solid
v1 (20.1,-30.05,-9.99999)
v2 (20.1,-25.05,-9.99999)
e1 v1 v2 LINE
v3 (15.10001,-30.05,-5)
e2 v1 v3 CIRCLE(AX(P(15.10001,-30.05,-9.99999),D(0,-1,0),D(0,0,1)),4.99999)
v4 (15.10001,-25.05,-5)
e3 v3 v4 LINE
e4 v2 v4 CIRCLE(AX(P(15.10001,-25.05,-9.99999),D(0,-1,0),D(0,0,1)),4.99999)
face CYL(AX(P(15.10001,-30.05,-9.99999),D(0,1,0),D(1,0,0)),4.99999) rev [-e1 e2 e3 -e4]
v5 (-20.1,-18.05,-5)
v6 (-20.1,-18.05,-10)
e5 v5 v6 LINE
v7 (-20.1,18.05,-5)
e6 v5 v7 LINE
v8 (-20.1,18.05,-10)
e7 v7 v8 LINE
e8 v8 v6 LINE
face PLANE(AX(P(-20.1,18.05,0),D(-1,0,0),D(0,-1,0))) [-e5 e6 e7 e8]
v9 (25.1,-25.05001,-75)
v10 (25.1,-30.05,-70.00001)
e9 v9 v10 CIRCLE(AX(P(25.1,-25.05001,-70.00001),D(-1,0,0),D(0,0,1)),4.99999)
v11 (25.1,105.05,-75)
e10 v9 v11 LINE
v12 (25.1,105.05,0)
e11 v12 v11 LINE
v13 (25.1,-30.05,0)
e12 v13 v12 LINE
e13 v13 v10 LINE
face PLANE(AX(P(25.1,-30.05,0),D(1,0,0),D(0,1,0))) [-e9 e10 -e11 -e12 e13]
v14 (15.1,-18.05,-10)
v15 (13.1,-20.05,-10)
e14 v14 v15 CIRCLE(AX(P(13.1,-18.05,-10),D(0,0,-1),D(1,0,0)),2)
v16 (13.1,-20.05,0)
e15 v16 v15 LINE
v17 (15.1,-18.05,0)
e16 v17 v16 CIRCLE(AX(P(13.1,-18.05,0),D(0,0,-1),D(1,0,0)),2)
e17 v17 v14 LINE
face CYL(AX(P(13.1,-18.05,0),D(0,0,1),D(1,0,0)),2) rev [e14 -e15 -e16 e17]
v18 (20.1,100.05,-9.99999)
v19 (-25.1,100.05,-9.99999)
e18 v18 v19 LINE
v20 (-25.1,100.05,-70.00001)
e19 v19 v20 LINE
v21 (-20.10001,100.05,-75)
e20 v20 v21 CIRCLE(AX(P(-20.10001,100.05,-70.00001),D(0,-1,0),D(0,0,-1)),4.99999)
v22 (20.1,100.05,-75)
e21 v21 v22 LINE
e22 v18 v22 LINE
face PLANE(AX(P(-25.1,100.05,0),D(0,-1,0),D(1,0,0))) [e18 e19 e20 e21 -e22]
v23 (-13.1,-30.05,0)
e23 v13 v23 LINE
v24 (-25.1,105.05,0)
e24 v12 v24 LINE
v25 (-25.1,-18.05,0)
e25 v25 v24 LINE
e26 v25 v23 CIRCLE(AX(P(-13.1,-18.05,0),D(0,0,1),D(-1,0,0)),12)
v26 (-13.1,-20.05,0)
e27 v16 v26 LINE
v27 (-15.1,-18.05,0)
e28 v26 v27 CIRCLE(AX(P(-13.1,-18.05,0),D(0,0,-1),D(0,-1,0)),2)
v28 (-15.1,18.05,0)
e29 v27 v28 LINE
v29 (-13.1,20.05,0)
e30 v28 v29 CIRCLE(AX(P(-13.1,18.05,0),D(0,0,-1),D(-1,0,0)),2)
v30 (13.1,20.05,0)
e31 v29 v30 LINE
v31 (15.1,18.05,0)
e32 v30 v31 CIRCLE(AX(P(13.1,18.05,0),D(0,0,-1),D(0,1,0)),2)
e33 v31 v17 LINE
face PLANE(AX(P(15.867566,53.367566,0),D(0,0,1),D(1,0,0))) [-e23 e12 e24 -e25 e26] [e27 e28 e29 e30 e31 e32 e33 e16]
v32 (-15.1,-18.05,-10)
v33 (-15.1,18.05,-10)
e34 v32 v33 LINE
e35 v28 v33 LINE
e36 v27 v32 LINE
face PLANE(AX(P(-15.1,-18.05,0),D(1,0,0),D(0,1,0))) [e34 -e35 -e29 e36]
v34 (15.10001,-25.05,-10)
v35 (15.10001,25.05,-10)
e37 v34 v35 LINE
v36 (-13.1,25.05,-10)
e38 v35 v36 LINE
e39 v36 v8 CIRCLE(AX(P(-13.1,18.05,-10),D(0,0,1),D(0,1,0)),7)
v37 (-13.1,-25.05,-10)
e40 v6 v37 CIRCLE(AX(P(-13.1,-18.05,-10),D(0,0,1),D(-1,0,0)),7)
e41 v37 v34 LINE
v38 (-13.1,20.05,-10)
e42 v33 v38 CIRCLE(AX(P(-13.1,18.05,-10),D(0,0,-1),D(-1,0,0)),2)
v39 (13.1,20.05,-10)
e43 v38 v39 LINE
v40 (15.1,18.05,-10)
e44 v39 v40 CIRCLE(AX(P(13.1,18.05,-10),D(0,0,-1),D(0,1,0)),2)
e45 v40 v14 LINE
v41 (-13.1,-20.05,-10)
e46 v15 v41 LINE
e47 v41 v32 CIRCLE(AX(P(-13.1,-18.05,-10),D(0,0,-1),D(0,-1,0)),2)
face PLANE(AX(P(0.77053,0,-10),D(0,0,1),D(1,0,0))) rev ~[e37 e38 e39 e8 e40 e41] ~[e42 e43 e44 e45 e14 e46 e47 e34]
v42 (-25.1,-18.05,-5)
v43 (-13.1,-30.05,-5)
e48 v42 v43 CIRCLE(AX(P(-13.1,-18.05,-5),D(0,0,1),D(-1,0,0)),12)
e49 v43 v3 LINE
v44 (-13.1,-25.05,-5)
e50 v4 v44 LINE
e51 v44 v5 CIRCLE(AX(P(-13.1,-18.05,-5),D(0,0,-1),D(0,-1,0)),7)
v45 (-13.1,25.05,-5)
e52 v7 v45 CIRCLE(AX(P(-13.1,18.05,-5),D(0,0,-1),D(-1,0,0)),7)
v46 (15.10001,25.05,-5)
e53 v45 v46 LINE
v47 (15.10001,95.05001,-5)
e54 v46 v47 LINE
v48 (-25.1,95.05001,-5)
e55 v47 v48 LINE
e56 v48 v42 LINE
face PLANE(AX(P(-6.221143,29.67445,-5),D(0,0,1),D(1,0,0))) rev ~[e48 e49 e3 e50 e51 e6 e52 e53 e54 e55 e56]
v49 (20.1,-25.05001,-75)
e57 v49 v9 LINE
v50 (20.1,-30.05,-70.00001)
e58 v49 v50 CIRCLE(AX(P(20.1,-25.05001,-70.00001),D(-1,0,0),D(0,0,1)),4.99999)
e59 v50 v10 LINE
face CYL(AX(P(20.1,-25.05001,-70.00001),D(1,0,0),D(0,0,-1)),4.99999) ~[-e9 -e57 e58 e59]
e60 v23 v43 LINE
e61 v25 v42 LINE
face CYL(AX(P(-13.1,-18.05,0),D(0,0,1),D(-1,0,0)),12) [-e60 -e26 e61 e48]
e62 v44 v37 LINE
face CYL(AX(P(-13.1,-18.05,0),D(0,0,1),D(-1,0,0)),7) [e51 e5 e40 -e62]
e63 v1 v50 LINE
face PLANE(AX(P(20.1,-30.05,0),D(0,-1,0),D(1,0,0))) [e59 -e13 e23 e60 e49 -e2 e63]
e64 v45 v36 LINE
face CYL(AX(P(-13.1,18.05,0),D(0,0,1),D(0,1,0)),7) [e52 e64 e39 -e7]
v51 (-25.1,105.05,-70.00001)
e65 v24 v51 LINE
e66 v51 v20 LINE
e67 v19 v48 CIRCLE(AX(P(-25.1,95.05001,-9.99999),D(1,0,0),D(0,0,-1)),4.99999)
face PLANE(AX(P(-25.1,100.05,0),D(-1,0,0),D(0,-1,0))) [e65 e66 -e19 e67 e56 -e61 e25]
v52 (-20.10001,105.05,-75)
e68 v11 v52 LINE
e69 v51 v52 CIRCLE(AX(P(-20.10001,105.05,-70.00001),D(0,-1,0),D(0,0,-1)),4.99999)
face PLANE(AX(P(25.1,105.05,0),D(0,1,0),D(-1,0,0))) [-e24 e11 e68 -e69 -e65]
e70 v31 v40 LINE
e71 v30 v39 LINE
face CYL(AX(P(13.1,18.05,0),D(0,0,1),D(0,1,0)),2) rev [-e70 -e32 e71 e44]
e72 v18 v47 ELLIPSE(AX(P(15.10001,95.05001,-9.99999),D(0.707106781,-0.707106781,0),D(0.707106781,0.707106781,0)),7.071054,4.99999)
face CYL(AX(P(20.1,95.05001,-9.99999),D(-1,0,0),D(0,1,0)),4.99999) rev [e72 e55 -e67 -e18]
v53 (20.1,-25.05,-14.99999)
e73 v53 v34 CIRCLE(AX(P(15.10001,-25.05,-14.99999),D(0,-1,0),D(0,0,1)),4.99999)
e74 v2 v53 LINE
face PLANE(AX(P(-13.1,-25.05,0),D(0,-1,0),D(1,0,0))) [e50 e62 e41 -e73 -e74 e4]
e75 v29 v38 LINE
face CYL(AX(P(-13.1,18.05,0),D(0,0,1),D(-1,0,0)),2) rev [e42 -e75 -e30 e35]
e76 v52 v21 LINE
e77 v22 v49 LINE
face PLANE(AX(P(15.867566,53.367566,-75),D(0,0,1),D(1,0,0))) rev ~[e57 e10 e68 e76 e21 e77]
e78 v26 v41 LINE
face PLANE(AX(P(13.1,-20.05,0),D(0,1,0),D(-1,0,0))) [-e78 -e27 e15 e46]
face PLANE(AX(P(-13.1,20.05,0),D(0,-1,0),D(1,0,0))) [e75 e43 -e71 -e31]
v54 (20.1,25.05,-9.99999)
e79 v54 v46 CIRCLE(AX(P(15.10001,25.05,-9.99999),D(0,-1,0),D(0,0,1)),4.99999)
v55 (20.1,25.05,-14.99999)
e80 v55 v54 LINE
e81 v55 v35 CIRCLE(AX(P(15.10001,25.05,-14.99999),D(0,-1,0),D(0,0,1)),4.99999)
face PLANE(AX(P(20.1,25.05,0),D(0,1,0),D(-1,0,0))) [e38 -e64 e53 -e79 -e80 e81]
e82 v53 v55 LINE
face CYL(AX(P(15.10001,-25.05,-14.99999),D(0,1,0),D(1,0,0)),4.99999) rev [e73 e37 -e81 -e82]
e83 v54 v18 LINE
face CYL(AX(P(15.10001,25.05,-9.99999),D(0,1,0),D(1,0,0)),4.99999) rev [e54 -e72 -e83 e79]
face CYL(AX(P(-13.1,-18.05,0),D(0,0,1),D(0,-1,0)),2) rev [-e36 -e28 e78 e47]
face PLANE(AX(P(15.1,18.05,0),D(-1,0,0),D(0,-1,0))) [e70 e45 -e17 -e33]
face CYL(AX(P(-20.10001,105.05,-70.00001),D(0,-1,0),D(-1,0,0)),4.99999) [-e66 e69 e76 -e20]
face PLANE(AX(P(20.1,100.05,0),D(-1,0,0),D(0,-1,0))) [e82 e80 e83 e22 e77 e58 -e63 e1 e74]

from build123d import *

# Parameters (mm, degrees)
F1_DEPTH = 5
F2_DEPTH = 10
F3_DEPTH = 75
F4_R     = 4.99999


# Not quite as in the source:
# - a fillet or chamfer is up to 0.001 mm smaller than in the source, because OpenCascade refuses the exact size


with BuildPart() as f1:
    # F0 (on Top) → F1 (new body)
    with BuildSketch(Plane.XY):
        with BuildLine():
            ThreePointArc((-20.1, 18.05), (-18.0497474683, 22.9997474683), (-13.1, 25.05))
            Line((-13.1, 25.05), (20.1, 25.05))
            Line((20.1, 25.05), (20.1, 100.05))
            Line((20.1, 100.05), (-25.1, 100.05))
            Line((-25.1, 100.05), (-25.1, -18.05))
            ThreePointArc((-25.1, -18.05), (-21.5852813742, -26.5352813742), (-13.1, -30.05))
            Line((-13.1, -30.05), (20.1, -30.05))
            Line((20.1, -30.05), (20.1, -25.05))
            Line((20.1, -25.05), (-13.1, -25.05))
            ThreePointArc((-13.1, -25.05), (-18.0497474683, -22.9997474683), (-20.1, -18.05))
            Line((-20.1, -18.05), (-20.1, 18.05))
        make_face()
    extrude(amount=-F1_DEPTH)

    # F0 (on Top) → F2 (join)
    with BuildSketch(Plane.XY):
        with BuildLine():
            Line((20.1, 25.05), (-13.1, 25.05))
            ThreePointArc((-13.1, 25.05), (-18.0497474683, 22.9997474683), (-20.1, 18.05))
            Line((-20.1, 18.05), (-20.1, -18.05))
            ThreePointArc((-20.1, -18.05), (-18.0497474683, -22.9997474683), (-13.1, -25.05))
            Line((-13.1, -25.05), (20.1, -25.05))
            Line((20.1, -25.05), (20.1, 25.05))
        make_face()
        with BuildLine():
            Line((-13.1, 20.05), (13.1, 20.05))
            ThreePointArc((13.1, 20.05), (14.5142135624, 19.4642135624), (15.1, 18.05))
            Line((15.1, 18.05), (15.1, -18.05))
            ThreePointArc((15.1, -18.05), (14.5142135624, -19.4642135624), (13.1, -20.05))
            Line((13.1, -20.05), (-13.1, -20.05))
            ThreePointArc((-13.1, -20.05), (-14.5142135624, -19.4642135624), (-15.1, -18.05))
            Line((-15.1, -18.05), (-15.1, 18.05))
            ThreePointArc((-15.1, 18.05), (-14.5142135624, 19.4642135624), (-13.1, 20.05))
        make_face(mode=Mode.SUBTRACT)
    extrude(amount=-F2_DEPTH)

    # F0 (on Top) → F3 (join)
    with BuildSketch(Plane.XY):
        Polygon((20.1, 100.05), (20.1, 25.05), (20.1, -25.05), (20.1, -30.05), (25.1, -30.05), (25.1, 105.05), (-25.1, 105.05), (-25.1, 100.05), align=None)
    extrude(amount=-F3_DEPTH)

    # F4 (radius 5 in the source; OpenCascade refuses exactly that, so slightly less here)
    f4_edges = [f1.edges().sort_by_distance(p)[0] for p in [
        (20.1, -27.55, -5),
        (20.1, 62.55, -5),
        (20.1, 0, -10),
        (22.6, -30.05, -75),
        (-25.1, 102.55, -75),
        (-2.5, 100.05, -5),
    ]]
    fillet(f4_edges, radius=F4_R)


solid = f1.part
